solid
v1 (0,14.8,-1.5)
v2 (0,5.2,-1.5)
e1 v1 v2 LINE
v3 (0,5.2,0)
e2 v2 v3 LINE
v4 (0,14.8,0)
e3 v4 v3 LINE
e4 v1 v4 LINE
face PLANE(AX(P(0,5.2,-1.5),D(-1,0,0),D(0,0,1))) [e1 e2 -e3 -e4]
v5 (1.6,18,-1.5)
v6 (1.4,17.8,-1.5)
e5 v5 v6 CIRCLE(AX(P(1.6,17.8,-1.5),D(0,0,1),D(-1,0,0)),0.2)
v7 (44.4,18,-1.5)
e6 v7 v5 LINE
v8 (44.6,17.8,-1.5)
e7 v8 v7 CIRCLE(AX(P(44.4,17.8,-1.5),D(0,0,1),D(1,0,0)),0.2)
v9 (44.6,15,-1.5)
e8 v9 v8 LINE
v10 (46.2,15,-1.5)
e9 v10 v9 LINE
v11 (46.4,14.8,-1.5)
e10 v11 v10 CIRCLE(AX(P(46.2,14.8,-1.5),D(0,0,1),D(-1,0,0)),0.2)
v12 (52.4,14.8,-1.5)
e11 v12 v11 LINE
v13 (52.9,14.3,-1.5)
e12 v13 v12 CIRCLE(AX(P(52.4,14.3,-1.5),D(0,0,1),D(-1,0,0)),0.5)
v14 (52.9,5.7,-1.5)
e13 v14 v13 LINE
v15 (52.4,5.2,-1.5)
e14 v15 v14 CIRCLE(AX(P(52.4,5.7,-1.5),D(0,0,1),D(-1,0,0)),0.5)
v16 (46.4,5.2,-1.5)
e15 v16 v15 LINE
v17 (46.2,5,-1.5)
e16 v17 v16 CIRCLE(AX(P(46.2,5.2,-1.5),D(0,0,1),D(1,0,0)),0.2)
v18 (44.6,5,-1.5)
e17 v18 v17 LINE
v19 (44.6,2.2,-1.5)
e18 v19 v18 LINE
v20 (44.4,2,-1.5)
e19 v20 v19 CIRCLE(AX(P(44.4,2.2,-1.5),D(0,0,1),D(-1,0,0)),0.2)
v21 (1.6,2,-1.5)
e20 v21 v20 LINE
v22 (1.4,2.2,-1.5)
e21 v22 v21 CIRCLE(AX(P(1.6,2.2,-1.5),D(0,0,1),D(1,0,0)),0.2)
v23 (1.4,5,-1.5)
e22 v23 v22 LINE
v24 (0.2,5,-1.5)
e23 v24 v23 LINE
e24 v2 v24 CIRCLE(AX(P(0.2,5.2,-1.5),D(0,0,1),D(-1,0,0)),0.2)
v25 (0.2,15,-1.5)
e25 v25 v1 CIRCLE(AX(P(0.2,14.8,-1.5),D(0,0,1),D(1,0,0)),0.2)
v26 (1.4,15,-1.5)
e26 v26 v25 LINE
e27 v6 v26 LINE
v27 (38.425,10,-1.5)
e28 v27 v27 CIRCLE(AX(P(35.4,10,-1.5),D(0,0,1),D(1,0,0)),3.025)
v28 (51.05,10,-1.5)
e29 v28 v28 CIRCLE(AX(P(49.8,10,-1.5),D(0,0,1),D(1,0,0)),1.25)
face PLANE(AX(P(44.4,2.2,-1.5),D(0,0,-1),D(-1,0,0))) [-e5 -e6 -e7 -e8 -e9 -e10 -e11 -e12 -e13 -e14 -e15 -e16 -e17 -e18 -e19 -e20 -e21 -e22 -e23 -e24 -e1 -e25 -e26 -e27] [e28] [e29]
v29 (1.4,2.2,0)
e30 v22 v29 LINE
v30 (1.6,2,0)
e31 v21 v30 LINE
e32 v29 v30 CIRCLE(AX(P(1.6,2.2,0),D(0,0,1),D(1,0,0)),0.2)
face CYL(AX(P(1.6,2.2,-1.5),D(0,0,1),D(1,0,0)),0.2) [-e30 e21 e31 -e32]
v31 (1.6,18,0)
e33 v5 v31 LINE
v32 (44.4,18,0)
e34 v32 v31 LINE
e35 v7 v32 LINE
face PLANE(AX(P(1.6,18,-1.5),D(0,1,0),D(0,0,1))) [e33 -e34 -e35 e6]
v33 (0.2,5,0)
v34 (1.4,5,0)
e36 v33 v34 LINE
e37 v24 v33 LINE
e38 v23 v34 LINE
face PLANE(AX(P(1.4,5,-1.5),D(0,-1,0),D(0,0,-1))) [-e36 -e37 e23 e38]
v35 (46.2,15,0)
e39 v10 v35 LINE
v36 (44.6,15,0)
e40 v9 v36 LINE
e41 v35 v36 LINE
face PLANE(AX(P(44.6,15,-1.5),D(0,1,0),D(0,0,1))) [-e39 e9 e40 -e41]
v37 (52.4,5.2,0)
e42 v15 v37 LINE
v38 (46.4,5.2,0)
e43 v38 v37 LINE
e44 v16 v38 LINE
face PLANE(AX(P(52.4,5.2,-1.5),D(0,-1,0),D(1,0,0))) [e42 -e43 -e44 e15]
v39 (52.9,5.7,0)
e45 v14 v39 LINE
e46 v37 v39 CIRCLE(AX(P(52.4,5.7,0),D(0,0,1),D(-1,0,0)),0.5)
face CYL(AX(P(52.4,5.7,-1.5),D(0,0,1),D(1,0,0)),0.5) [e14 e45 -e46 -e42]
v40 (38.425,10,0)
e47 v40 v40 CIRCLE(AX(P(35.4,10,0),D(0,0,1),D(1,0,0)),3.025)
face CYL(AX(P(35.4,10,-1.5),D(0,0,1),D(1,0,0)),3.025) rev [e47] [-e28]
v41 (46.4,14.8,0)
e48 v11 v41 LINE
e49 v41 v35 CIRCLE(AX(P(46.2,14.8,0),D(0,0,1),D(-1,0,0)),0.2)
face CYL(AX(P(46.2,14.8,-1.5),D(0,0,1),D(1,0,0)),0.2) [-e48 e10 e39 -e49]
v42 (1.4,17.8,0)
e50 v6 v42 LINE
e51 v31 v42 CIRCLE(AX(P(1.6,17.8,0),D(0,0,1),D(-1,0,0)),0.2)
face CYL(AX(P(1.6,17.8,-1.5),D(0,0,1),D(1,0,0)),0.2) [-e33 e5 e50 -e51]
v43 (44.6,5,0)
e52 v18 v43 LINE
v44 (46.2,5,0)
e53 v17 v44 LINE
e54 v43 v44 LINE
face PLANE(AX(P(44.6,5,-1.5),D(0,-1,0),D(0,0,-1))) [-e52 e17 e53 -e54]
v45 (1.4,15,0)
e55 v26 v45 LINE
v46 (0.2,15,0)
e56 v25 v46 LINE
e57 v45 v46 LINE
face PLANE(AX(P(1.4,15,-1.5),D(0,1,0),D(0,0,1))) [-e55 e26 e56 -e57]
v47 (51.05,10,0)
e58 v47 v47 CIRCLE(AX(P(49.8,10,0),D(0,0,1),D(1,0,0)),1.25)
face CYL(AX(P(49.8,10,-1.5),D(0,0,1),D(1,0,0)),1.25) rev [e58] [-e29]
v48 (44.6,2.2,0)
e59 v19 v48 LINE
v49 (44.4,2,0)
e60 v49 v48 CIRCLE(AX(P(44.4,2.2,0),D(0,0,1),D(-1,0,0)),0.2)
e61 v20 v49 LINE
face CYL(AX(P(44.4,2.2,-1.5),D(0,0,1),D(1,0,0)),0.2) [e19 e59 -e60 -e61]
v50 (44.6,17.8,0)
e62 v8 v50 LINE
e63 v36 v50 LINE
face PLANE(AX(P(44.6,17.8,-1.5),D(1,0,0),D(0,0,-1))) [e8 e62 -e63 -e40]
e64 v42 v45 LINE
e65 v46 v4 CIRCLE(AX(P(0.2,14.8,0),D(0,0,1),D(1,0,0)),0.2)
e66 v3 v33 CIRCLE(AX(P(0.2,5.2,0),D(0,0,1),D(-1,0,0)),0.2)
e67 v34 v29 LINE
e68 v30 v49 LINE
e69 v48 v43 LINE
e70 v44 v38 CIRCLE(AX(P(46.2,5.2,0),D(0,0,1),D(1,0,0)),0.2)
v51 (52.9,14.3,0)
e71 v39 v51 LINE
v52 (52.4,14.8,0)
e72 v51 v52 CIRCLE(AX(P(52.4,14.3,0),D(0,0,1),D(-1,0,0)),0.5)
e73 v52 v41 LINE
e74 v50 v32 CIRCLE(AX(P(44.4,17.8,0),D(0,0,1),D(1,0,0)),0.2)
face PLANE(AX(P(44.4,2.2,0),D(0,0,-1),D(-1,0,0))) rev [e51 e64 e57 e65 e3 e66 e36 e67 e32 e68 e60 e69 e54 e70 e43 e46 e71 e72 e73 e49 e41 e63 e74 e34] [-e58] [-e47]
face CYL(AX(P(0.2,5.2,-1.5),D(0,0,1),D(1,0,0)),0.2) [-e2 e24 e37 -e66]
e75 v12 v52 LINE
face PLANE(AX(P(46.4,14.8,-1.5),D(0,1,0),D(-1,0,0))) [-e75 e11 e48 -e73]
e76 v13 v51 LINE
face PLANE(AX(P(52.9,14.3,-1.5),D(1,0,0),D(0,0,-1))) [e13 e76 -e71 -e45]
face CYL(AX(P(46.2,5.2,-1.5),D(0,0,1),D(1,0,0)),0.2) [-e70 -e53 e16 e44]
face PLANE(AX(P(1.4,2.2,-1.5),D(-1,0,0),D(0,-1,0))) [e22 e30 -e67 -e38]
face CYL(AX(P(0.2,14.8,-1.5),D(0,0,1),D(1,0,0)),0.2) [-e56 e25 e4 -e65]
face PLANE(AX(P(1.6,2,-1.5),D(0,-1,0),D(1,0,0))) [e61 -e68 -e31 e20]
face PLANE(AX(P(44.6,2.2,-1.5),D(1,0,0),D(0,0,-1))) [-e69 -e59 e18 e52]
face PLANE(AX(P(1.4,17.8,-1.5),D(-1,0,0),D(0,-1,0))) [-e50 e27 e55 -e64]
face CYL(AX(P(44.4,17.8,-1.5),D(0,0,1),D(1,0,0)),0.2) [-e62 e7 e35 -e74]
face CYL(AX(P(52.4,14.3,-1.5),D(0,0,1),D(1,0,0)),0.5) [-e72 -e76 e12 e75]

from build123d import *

# Parameters (mm, degrees)
SKETCH1_R          = 3.025
BASE_FLANGE1_DEPTH = 1.5
SKETCH6_R          = 1.25
TAB1_DEPTH         = 1.5


# Sheet-metal steps are written as plain solids
with BuildPart() as part:
    # Sketch1 → Base-Flange1 (new body)
    with BuildSketch(Plane.XY):
        with BuildLine():
            Line((1.4, 17.8), (1.4, 15))
            Line((1.4, 15), (0.2, 15))
            ThreePointArc((0.2, 15), (0.058578644, 14.941421356), (0, 14.8))
            Line((0, 14.8), (0, 5.2))
            ThreePointArc((0, 5.2), (0.058578644, 5.058578644), (0.2, 5))
            Line((0.2, 5), (1.4, 5))
            Line((1.4, 5), (1.4, 2.2))
            ThreePointArc((1.4, 2.2), (1.458578644, 2.058578644), (1.6, 2))
            Line((1.6, 2), (44.4, 2))
            ThreePointArc((44.4, 2), (44.541421356, 2.058578644), (44.6, 2.2))
            Line((44.6, 2.2), (44.6, 5))
            Line((44.6, 5), (46.2, 5))
            ThreePointArc((46.2, 5), (46.341421356, 5.058578644), (46.4, 5.2))
            Line((46.4, 5.2), (46.4, 14.8))
            ThreePointArc((46.4, 14.8), (46.341421356, 14.941421356), (46.2, 15))
            Line((46.2, 15), (44.6, 15))
            Line((44.6, 15), (44.6, 17.8))
            ThreePointArc((44.6, 17.8), (44.541421356, 17.941421356), (44.4, 18))
            Line((44.4, 18), (1.6, 18))
            ThreePointArc((1.6, 18), (1.458578644, 17.941421356), (1.4, 17.8))
        make_face()
        with Locations((35.4, 10)):
            Circle(SKETCH1_R, mode=Mode.SUBTRACT)
    extrude(amount=-BASE_FLANGE1_DEPTH)

    # Sketch6 → Tab1 (add)
    with BuildSketch(Plane.XY):
        with BuildLine():
            Line((46.4, 14.8), (52.4, 14.8))
            ThreePointArc((52.4, 14.8), (52.753553391, 14.653553391), (52.9, 14.3))
            Line((52.9, 14.3), (52.9, 5.7))
            ThreePointArc((52.9, 5.7), (52.753553391, 5.346446609), (52.4, 5.2))
            Line((52.4, 5.2), (46.4, 5.2))
            Line((46.4, 5.2), (46.4, 14.8))
        make_face()
        with Locations((49.8, 10)):
            Circle(SKETCH6_R, mode=Mode.SUBTRACT)
    extrude(amount=-TAB1_DEPTH)


solid = part.part
